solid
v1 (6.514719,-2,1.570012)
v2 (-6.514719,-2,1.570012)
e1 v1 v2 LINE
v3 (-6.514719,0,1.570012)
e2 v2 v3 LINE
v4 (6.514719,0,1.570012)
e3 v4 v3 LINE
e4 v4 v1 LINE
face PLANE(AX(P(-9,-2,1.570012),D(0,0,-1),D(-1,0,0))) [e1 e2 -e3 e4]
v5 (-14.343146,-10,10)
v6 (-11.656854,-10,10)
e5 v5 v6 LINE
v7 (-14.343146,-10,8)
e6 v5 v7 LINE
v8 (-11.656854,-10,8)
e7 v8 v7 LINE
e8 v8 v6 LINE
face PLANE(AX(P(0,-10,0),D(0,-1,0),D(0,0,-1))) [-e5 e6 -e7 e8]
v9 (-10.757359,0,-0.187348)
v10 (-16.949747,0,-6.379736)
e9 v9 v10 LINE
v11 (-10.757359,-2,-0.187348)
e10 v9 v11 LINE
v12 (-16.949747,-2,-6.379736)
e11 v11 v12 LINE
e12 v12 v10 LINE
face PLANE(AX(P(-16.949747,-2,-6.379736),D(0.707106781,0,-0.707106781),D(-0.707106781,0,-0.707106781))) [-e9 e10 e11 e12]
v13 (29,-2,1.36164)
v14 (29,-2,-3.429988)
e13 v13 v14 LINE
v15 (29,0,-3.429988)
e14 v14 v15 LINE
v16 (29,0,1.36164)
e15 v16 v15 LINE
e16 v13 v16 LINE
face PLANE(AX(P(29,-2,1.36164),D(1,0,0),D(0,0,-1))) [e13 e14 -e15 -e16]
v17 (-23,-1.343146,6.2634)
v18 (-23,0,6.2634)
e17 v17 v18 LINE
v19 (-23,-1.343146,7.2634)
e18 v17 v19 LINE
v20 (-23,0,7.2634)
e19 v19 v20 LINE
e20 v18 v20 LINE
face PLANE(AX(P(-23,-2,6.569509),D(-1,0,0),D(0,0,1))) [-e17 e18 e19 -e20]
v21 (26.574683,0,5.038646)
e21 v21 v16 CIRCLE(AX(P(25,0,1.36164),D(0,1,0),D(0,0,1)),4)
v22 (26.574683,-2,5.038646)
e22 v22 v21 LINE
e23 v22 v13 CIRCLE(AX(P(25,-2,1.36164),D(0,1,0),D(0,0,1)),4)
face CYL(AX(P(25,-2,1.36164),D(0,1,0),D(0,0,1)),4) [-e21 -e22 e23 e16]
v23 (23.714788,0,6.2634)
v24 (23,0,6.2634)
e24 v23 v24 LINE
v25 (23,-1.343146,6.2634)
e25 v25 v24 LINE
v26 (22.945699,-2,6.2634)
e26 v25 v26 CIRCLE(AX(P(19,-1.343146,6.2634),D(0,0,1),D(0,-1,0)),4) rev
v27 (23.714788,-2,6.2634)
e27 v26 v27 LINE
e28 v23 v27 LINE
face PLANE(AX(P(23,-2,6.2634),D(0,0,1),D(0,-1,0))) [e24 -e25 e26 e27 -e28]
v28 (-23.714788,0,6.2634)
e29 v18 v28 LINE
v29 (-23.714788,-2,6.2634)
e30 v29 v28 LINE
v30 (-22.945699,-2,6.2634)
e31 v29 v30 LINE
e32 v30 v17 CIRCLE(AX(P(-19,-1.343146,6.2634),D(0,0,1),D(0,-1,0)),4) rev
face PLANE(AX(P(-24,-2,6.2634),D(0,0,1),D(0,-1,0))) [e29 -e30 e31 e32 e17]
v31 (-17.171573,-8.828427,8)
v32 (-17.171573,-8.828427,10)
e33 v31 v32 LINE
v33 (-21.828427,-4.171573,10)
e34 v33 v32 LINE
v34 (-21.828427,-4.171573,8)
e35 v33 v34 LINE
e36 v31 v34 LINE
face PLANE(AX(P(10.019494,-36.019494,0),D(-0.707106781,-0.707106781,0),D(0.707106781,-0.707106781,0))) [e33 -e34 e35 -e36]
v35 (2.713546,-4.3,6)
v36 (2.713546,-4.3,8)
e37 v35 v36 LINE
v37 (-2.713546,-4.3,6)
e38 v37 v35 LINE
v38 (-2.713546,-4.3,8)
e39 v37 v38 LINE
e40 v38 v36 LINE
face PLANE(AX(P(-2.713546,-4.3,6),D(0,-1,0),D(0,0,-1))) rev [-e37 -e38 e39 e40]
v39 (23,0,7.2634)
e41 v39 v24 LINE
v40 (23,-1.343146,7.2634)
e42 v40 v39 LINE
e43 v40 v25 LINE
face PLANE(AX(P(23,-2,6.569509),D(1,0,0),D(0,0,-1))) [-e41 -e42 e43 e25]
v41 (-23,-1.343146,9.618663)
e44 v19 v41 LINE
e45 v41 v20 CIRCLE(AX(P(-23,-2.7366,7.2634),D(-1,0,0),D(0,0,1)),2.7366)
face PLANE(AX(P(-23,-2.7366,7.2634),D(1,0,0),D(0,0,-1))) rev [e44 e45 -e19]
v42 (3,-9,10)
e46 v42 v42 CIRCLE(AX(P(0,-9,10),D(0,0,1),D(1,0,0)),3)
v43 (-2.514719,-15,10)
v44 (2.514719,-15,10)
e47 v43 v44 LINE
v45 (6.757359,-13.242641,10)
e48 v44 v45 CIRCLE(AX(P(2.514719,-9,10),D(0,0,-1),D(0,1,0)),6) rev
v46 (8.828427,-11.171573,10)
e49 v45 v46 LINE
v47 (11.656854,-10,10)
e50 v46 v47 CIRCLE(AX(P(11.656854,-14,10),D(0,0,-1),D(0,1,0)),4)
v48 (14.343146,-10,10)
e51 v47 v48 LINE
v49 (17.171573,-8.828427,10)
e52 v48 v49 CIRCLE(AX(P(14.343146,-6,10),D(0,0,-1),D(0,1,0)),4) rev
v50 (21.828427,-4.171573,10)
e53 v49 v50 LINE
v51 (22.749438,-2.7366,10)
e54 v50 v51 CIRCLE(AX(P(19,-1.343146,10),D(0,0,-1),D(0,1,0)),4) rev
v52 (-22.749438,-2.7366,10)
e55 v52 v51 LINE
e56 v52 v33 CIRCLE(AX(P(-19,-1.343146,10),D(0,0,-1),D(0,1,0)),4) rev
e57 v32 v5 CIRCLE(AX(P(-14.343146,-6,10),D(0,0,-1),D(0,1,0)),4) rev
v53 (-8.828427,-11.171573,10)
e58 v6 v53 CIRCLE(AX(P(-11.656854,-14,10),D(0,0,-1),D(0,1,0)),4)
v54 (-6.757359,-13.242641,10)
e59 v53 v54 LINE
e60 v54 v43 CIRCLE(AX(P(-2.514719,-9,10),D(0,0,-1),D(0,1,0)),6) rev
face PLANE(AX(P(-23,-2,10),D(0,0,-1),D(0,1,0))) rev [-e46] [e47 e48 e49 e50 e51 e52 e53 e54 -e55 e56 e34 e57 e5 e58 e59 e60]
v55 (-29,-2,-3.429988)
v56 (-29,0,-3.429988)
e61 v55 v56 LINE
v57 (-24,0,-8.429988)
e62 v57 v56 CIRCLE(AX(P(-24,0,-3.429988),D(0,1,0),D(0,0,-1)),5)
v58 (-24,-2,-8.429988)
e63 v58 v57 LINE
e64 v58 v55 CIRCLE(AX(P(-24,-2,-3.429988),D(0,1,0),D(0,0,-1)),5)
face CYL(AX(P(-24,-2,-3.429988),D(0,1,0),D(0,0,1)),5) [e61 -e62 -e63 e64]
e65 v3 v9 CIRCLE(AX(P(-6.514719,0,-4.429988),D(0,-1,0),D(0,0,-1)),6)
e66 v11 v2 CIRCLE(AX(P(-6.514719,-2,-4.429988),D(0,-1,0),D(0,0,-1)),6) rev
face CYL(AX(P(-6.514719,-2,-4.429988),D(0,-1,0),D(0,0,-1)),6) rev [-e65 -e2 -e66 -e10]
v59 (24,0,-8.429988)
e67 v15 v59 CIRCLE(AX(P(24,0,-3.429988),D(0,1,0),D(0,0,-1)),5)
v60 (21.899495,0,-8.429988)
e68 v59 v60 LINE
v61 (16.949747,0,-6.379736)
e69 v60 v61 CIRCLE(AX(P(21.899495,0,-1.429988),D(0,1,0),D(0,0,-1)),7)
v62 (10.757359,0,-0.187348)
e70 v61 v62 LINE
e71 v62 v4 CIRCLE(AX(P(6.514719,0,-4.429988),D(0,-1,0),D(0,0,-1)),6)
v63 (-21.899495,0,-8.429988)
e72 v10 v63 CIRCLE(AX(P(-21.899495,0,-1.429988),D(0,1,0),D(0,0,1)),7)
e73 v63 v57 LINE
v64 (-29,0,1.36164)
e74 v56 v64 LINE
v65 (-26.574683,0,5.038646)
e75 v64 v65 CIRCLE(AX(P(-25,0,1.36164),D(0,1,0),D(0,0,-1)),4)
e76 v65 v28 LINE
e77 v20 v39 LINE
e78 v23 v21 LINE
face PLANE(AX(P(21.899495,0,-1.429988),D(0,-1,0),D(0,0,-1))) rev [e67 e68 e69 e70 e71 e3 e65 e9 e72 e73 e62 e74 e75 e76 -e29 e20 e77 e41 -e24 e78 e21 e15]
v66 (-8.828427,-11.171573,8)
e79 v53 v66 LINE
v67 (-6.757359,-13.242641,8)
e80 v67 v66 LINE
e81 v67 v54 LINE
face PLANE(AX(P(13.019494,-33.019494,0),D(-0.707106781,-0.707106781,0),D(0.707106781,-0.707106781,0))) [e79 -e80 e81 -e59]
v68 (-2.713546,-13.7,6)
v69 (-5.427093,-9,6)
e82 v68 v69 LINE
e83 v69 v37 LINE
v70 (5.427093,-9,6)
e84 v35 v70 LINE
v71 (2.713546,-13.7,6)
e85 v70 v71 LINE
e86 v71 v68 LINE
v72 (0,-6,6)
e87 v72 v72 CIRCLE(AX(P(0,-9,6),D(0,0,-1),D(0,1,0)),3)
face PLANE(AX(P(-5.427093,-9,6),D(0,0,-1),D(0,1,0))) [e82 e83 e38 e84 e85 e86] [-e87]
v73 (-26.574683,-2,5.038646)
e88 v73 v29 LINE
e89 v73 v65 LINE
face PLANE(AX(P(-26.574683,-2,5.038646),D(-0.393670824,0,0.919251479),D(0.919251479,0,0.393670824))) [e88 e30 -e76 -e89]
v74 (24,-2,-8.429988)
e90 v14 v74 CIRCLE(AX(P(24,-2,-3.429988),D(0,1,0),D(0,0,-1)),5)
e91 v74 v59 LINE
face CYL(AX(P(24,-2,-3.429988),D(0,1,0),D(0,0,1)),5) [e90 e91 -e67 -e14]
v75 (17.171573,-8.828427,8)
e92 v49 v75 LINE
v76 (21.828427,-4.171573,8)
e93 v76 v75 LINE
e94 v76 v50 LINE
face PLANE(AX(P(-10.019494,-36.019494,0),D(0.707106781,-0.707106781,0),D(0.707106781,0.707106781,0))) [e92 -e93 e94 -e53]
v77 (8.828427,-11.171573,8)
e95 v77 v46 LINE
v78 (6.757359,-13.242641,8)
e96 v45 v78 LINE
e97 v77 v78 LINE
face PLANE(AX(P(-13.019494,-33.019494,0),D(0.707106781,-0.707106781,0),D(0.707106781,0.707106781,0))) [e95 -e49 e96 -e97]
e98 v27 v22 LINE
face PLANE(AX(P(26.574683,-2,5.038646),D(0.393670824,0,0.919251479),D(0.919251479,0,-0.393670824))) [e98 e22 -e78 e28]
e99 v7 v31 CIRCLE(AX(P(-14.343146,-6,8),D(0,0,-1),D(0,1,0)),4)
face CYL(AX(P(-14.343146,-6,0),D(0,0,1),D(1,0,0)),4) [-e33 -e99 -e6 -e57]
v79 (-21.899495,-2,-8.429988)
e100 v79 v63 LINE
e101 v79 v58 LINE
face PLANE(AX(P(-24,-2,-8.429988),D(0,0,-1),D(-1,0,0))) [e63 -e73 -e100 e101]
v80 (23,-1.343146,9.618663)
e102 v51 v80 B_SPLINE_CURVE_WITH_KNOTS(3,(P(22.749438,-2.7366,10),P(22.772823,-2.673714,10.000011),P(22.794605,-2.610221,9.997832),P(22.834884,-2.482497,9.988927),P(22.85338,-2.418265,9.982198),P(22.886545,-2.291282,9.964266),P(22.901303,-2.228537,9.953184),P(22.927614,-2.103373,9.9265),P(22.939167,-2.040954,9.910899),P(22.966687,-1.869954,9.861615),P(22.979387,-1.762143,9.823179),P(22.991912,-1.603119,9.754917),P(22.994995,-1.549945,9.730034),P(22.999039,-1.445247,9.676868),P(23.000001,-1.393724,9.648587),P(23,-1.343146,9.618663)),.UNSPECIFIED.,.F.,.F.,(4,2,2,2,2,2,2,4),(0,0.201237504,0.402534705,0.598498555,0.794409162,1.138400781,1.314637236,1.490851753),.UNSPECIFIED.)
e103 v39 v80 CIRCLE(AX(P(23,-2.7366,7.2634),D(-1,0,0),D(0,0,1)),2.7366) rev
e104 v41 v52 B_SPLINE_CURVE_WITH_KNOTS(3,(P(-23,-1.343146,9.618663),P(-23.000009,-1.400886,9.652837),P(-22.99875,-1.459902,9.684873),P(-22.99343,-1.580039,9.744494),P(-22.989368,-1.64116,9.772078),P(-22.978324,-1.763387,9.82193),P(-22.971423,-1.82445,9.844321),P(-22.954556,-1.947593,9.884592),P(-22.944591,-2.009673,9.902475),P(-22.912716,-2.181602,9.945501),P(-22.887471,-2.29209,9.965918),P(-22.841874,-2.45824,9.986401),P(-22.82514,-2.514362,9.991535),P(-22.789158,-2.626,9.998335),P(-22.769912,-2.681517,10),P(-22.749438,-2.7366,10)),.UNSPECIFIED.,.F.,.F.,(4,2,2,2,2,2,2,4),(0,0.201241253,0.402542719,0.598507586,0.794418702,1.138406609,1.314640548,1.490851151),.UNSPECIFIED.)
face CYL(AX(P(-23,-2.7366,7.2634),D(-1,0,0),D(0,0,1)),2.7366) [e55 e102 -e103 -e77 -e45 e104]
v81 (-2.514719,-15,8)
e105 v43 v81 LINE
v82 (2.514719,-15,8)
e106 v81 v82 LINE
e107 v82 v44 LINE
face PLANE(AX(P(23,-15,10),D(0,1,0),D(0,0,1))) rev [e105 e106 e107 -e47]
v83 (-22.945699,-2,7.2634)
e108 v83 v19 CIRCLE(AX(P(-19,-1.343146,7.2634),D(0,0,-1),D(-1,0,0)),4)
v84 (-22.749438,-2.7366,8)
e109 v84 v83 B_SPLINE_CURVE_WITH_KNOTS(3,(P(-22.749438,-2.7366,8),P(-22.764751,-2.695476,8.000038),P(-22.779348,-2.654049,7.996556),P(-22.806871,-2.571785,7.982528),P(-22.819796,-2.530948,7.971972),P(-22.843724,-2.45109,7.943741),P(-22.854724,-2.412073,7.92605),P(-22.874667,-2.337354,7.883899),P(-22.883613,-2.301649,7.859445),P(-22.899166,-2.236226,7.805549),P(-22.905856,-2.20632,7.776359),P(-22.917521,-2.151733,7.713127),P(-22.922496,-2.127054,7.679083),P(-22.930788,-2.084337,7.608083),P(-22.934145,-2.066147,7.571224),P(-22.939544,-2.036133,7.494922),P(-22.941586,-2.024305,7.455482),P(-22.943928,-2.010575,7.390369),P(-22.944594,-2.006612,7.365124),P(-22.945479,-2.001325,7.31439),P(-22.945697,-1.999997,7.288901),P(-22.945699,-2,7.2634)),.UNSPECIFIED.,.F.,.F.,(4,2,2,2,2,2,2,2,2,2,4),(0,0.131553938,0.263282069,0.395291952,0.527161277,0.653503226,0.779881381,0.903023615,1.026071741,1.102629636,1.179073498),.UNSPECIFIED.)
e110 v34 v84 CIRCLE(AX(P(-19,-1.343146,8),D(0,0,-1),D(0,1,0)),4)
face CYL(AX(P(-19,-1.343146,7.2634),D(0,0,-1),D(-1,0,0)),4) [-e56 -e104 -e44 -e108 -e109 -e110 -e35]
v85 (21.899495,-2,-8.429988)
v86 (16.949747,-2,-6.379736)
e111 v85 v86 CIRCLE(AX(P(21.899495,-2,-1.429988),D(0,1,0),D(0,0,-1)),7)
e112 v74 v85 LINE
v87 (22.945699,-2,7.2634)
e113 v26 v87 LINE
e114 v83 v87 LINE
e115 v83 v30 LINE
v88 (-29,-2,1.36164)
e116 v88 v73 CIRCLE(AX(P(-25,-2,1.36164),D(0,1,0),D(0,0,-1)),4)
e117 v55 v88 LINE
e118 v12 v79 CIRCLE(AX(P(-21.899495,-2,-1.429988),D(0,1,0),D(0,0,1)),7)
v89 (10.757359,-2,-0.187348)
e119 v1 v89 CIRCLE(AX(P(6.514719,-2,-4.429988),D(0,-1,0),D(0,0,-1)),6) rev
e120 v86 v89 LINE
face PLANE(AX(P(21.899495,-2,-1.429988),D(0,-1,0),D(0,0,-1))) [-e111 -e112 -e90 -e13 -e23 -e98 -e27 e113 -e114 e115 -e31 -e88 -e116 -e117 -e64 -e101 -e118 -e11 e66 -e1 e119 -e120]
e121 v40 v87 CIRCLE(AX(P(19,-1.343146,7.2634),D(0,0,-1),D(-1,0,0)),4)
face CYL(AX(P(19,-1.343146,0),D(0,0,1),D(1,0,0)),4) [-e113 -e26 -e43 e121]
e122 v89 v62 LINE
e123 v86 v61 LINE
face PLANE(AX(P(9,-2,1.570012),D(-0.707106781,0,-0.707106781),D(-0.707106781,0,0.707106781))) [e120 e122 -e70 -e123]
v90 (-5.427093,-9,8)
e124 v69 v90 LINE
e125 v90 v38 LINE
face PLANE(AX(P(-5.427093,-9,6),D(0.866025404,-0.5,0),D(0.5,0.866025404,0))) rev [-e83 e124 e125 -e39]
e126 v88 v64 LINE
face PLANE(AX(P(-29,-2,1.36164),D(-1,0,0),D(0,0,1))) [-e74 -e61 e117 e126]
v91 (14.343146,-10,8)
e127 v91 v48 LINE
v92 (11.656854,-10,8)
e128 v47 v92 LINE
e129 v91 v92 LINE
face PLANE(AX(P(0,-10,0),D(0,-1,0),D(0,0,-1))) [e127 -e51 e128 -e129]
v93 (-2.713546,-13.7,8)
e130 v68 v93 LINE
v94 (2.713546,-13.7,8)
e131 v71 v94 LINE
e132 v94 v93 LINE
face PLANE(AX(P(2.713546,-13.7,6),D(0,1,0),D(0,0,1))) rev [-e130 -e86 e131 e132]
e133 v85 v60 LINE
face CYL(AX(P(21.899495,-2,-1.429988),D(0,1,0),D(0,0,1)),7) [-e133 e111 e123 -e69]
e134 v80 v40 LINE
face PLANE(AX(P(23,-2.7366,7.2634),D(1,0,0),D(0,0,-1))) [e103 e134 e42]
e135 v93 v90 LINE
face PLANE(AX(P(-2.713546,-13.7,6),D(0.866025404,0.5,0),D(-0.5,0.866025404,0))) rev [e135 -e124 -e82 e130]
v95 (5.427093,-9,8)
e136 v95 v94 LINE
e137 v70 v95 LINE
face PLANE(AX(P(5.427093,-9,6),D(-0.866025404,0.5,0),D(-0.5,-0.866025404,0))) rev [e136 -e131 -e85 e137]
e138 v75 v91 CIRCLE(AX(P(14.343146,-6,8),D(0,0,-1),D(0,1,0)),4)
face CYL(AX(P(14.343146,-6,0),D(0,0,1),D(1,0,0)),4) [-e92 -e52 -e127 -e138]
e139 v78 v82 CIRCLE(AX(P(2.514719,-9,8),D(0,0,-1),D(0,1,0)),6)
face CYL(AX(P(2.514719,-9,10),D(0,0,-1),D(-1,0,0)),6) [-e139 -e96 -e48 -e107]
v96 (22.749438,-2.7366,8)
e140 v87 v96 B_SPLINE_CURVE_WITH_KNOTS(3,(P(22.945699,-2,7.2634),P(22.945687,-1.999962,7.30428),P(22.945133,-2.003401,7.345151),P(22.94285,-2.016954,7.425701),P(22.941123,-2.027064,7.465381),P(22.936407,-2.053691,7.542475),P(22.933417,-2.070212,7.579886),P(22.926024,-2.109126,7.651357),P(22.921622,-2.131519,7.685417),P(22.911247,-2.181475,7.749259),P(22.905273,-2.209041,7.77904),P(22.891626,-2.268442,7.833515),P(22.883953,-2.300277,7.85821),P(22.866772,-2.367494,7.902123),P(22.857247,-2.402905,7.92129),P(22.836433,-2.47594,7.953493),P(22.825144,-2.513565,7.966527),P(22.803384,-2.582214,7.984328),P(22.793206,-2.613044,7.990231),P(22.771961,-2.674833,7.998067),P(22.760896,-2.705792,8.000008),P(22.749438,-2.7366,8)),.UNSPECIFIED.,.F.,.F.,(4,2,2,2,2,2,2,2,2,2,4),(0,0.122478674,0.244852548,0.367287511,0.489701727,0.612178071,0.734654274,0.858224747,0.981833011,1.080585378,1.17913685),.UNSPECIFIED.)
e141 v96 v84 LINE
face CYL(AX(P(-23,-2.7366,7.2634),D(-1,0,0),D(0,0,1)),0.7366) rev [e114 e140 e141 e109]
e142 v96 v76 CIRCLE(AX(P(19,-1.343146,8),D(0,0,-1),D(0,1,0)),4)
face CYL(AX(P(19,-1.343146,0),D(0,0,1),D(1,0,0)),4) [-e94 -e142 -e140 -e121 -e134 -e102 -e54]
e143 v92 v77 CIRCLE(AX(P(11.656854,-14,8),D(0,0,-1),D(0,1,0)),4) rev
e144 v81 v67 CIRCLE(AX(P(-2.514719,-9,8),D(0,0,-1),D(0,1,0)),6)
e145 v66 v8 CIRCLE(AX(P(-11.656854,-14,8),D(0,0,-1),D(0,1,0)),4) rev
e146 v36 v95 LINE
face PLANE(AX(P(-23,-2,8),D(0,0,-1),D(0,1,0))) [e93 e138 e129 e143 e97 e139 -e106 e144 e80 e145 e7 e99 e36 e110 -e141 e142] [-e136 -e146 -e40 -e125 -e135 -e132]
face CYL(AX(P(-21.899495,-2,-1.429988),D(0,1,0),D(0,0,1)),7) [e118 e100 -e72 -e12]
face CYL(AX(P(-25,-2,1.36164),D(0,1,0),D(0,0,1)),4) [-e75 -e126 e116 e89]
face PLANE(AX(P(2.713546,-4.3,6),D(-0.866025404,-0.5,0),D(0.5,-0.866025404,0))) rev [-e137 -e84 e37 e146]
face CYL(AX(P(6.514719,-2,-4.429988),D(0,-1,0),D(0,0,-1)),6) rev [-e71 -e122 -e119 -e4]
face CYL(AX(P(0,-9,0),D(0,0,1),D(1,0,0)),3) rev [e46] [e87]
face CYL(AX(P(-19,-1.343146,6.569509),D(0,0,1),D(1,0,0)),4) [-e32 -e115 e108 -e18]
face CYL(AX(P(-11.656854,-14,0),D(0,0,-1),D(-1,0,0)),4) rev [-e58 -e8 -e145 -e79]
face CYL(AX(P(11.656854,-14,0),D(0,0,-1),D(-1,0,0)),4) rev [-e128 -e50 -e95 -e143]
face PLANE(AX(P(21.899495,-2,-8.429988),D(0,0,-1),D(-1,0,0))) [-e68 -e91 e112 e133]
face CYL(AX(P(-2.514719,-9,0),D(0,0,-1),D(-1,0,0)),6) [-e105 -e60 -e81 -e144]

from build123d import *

# Parameters (mm, degrees)
BASE_FLANGE1_DEPTH   = 2
EDGE_FLANGE1_START   = -23
EDGE_FLANGE1_DEPTH   = 46
EDGE_FLANGE1_START_2 = -23.714787909
EDGE_FLANGE1_2_DEPTH = 0.714787909
EDGE_FLANGE1_START_3 = 23
EDGE_FLANGE1_3_DEPTH = 0.714787909
EDGE_FLANGE1_4_DEPTH = 46
CUT_EXTRUDE1_DEPTH   = 10
FILLET1_R            = 4
FILLET2_R            = 6
SKETCH9_R            = 3
CUT_EXTRUDE2_DEPTH   = 10
SKETCH10_R           = 3
BOSS_EXTRUDE1_DEPTH  = 2


# Read off the part's stored shape, not the designer's step: Edge-Flange1
# Sheet-metal steps are written as plain solids
with BuildPart() as part:
    # Sketch1 → Base-Flange1 (new body)
    with BuildSketch(Plane(origin=(0, 0, 0), x_dir=(1, 0, 0), z_dir=(0, 1, 0))):
        with BuildLine():
            Line((-16.949747468, 6.379735664), (-9, -1.570011804))
            Line((-9, -1.570011804), (9, -1.570011804))
            Line((9, -1.570011804), (16.949747468, 6.379735664))
            ThreePointArc((16.949747468, 6.379735664), (19.22071091, 7.897144924), (21.899494937, 8.429988196))
            Line((21.899494937, 8.429988196), (24, 8.429988196))
            ThreePointArc((24, 8.429988196), (27.535533906, 6.965522102), (29, 3.429988196))
            Line((29, 3.429988196), (29, -1.361639596))
            ThreePointArc((29, -1.361639596), (28.339066725, -3.564054954), (26.574683296, -5.038645514))
            Line((26.574683296, -5.038645514), (23, -6.569508994))
            Line((23, -6.569508994), (23, -10))
            Line((23, -10), (-23, -10))
            Line((-23, -10), (-23, -6.569508994))
            Line((-23, -6.569508994), (-26.574683296, -5.038645514))
            ThreePointArc((-26.574683296, -5.038645514), (-28.339066725, -3.564054954), (-29, -1.361639596))
            Line((-29, -1.361639596), (-29, 3.429988196))
            ThreePointArc((-29, 3.429988196), (-27.535533906, 6.965522102), (-24, 8.429988196))
            Line((-24, 8.429988196), (-21.899494937, 8.429988196))
            ThreePointArc((-21.899494937, 8.429988196), (-19.22071091, 7.897144924), (-16.949747468, 6.379735664))
        make_face()
    extrude(amount=-BASE_FLANGE1_DEPTH)

    # Edge-Flange1 outline → Edge-Flange1 (cut)
    with BuildSketch(Plane.YZ.offset(EDGE_FLANGE1_START)):
        with BuildLine():
            ThreePointArc((-2, 9.899002398), (-0.556604688, 8.917667209), (0, 7.2634))
            Line((0, 7.2634), (0, 10))
            Line((0, 10), (-2, 10))
            Line((-2, 10), (-2, 9.899002398))
        make_face()
    extrude(amount=EDGE_FLANGE1_DEPTH, mode=Mode.SUBTRACT)

    # Edge-Flange1 2 outline → Edge-Flange1 2 (cut)
    with BuildSketch(Plane.YZ.offset(EDGE_FLANGE1_START_2)):
        with BuildLine():
            Line((-2, 6.2634), (0, 6.2634))
            Line((0, 6.2634), (0, 7.2634))
            ThreePointArc((0, 7.2634), (-0.556604688, 8.917667209), (-2, 9.899002398))
            Line((-2, 9.899002398), (-2, 6.2634))
        make_face()
    extrude(amount=EDGE_FLANGE1_2_DEPTH, mode=Mode.SUBTRACT)

    # Edge-Flange1 3 outline → Edge-Flange1 3 (cut)
    with BuildSketch(Plane.YZ.offset(EDGE_FLANGE1_START_3)):
        with BuildLine():
            Line((-2, 6.2634), (0, 6.2634))
            Line((0, 6.2634), (0, 7.2634))
            ThreePointArc((0, 7.2634), (-0.556604688, 8.917667209), (-2, 9.899002398))
            Line((-2, 9.899002398), (-2, 6.2634))
        make_face()
    extrude(amount=EDGE_FLANGE1_3_DEPTH, mode=Mode.SUBTRACT)

    # Edge-Flange1 4 outline → Edge-Flange1 4 (add)
    with BuildSketch(Plane.YZ.offset(EDGE_FLANGE1_START)):
        with BuildLine():
            ThreePointArc((-2.7366, 8), (-2.215745145, 7.784254855), (-2, 7.2634))
            Line((-2, 7.2634), (-2, 9.899002398))
            ThreePointArc((-2, 9.899002398), (-2.364854094, 9.974633029), (-2.7366, 10))
            Line((-2.7366, 10), (-15, 10))
            Line((-15, 10), (-15, 8))
            Line((-15, 8), (-2.7366, 8))
        make_face()
    extrude(amount=EDGE_FLANGE1_4_DEPTH)

    # Sketch8 → Cut-Extrude1 (cut)
    with BuildSketch(Plane.XY.offset(10)):
        Polygon((-16, -10), (-23, -3), (-23, -15), (-5, -15), (-10, -10), align=None)
        Polygon((10, -10), (5, -15), (23, -15), (23, -3), (16, -10), align=None)
    extrude(amount=-CUT_EXTRUDE1_DEPTH, mode=Mode.SUBTRACT)

    # Fillet1
    fillet1_edges = [part.edges().sort_by_distance(p)[0] for p in [
        (-23, -3, 9),
        (-16, -10, 9),
        (-10, -10, 9),
        (10, -10, 9),
        (16, -10, 9),
        (23, -3, 9),
    ]]
    fillet(fillet1_edges, radius=FILLET1_R)

    # Fillet2
    fillet2_edges = [part.edges().sort_by_distance(p)[0] for p in [
        (-5, -15, 9),
        (5, -15, 9),
        (9, -1, 1.570011804),
        (-9, -1, 1.570011804),
    ]]
    fillet(fillet2_edges, radius=FILLET2_R)

    # Sketch9 → Cut-Extrude2 (cut)
    with BuildSketch(Plane.XY.offset(10)):
        with Locations((0, -9)):
            Circle(SKETCH9_R)
    extrude(amount=-CUT_EXTRUDE2_DEPTH, mode=Mode.SUBTRACT)

    # Sketch10 → Boss-Extrude1 (add)
    with BuildSketch(Plane(origin=(0, 0, 8), x_dir=(-1, 0, 0), z_dir=(0, 0, -1))):
        Polygon((5.42709253, -9), (2.713546265, -4.3), (-2.713546265, -4.3), (-5.42709253, -9), (-2.713546265, -13.7), (2.713546265, -13.7), align=None)
        with Locations(Location((0, -9, 0), (0, 0, 180))):
            Circle(SKETCH10_R, mode=Mode.SUBTRACT)
    extrude(amount=BOSS_EXTRUDE1_DEPTH)


solid = part.part
